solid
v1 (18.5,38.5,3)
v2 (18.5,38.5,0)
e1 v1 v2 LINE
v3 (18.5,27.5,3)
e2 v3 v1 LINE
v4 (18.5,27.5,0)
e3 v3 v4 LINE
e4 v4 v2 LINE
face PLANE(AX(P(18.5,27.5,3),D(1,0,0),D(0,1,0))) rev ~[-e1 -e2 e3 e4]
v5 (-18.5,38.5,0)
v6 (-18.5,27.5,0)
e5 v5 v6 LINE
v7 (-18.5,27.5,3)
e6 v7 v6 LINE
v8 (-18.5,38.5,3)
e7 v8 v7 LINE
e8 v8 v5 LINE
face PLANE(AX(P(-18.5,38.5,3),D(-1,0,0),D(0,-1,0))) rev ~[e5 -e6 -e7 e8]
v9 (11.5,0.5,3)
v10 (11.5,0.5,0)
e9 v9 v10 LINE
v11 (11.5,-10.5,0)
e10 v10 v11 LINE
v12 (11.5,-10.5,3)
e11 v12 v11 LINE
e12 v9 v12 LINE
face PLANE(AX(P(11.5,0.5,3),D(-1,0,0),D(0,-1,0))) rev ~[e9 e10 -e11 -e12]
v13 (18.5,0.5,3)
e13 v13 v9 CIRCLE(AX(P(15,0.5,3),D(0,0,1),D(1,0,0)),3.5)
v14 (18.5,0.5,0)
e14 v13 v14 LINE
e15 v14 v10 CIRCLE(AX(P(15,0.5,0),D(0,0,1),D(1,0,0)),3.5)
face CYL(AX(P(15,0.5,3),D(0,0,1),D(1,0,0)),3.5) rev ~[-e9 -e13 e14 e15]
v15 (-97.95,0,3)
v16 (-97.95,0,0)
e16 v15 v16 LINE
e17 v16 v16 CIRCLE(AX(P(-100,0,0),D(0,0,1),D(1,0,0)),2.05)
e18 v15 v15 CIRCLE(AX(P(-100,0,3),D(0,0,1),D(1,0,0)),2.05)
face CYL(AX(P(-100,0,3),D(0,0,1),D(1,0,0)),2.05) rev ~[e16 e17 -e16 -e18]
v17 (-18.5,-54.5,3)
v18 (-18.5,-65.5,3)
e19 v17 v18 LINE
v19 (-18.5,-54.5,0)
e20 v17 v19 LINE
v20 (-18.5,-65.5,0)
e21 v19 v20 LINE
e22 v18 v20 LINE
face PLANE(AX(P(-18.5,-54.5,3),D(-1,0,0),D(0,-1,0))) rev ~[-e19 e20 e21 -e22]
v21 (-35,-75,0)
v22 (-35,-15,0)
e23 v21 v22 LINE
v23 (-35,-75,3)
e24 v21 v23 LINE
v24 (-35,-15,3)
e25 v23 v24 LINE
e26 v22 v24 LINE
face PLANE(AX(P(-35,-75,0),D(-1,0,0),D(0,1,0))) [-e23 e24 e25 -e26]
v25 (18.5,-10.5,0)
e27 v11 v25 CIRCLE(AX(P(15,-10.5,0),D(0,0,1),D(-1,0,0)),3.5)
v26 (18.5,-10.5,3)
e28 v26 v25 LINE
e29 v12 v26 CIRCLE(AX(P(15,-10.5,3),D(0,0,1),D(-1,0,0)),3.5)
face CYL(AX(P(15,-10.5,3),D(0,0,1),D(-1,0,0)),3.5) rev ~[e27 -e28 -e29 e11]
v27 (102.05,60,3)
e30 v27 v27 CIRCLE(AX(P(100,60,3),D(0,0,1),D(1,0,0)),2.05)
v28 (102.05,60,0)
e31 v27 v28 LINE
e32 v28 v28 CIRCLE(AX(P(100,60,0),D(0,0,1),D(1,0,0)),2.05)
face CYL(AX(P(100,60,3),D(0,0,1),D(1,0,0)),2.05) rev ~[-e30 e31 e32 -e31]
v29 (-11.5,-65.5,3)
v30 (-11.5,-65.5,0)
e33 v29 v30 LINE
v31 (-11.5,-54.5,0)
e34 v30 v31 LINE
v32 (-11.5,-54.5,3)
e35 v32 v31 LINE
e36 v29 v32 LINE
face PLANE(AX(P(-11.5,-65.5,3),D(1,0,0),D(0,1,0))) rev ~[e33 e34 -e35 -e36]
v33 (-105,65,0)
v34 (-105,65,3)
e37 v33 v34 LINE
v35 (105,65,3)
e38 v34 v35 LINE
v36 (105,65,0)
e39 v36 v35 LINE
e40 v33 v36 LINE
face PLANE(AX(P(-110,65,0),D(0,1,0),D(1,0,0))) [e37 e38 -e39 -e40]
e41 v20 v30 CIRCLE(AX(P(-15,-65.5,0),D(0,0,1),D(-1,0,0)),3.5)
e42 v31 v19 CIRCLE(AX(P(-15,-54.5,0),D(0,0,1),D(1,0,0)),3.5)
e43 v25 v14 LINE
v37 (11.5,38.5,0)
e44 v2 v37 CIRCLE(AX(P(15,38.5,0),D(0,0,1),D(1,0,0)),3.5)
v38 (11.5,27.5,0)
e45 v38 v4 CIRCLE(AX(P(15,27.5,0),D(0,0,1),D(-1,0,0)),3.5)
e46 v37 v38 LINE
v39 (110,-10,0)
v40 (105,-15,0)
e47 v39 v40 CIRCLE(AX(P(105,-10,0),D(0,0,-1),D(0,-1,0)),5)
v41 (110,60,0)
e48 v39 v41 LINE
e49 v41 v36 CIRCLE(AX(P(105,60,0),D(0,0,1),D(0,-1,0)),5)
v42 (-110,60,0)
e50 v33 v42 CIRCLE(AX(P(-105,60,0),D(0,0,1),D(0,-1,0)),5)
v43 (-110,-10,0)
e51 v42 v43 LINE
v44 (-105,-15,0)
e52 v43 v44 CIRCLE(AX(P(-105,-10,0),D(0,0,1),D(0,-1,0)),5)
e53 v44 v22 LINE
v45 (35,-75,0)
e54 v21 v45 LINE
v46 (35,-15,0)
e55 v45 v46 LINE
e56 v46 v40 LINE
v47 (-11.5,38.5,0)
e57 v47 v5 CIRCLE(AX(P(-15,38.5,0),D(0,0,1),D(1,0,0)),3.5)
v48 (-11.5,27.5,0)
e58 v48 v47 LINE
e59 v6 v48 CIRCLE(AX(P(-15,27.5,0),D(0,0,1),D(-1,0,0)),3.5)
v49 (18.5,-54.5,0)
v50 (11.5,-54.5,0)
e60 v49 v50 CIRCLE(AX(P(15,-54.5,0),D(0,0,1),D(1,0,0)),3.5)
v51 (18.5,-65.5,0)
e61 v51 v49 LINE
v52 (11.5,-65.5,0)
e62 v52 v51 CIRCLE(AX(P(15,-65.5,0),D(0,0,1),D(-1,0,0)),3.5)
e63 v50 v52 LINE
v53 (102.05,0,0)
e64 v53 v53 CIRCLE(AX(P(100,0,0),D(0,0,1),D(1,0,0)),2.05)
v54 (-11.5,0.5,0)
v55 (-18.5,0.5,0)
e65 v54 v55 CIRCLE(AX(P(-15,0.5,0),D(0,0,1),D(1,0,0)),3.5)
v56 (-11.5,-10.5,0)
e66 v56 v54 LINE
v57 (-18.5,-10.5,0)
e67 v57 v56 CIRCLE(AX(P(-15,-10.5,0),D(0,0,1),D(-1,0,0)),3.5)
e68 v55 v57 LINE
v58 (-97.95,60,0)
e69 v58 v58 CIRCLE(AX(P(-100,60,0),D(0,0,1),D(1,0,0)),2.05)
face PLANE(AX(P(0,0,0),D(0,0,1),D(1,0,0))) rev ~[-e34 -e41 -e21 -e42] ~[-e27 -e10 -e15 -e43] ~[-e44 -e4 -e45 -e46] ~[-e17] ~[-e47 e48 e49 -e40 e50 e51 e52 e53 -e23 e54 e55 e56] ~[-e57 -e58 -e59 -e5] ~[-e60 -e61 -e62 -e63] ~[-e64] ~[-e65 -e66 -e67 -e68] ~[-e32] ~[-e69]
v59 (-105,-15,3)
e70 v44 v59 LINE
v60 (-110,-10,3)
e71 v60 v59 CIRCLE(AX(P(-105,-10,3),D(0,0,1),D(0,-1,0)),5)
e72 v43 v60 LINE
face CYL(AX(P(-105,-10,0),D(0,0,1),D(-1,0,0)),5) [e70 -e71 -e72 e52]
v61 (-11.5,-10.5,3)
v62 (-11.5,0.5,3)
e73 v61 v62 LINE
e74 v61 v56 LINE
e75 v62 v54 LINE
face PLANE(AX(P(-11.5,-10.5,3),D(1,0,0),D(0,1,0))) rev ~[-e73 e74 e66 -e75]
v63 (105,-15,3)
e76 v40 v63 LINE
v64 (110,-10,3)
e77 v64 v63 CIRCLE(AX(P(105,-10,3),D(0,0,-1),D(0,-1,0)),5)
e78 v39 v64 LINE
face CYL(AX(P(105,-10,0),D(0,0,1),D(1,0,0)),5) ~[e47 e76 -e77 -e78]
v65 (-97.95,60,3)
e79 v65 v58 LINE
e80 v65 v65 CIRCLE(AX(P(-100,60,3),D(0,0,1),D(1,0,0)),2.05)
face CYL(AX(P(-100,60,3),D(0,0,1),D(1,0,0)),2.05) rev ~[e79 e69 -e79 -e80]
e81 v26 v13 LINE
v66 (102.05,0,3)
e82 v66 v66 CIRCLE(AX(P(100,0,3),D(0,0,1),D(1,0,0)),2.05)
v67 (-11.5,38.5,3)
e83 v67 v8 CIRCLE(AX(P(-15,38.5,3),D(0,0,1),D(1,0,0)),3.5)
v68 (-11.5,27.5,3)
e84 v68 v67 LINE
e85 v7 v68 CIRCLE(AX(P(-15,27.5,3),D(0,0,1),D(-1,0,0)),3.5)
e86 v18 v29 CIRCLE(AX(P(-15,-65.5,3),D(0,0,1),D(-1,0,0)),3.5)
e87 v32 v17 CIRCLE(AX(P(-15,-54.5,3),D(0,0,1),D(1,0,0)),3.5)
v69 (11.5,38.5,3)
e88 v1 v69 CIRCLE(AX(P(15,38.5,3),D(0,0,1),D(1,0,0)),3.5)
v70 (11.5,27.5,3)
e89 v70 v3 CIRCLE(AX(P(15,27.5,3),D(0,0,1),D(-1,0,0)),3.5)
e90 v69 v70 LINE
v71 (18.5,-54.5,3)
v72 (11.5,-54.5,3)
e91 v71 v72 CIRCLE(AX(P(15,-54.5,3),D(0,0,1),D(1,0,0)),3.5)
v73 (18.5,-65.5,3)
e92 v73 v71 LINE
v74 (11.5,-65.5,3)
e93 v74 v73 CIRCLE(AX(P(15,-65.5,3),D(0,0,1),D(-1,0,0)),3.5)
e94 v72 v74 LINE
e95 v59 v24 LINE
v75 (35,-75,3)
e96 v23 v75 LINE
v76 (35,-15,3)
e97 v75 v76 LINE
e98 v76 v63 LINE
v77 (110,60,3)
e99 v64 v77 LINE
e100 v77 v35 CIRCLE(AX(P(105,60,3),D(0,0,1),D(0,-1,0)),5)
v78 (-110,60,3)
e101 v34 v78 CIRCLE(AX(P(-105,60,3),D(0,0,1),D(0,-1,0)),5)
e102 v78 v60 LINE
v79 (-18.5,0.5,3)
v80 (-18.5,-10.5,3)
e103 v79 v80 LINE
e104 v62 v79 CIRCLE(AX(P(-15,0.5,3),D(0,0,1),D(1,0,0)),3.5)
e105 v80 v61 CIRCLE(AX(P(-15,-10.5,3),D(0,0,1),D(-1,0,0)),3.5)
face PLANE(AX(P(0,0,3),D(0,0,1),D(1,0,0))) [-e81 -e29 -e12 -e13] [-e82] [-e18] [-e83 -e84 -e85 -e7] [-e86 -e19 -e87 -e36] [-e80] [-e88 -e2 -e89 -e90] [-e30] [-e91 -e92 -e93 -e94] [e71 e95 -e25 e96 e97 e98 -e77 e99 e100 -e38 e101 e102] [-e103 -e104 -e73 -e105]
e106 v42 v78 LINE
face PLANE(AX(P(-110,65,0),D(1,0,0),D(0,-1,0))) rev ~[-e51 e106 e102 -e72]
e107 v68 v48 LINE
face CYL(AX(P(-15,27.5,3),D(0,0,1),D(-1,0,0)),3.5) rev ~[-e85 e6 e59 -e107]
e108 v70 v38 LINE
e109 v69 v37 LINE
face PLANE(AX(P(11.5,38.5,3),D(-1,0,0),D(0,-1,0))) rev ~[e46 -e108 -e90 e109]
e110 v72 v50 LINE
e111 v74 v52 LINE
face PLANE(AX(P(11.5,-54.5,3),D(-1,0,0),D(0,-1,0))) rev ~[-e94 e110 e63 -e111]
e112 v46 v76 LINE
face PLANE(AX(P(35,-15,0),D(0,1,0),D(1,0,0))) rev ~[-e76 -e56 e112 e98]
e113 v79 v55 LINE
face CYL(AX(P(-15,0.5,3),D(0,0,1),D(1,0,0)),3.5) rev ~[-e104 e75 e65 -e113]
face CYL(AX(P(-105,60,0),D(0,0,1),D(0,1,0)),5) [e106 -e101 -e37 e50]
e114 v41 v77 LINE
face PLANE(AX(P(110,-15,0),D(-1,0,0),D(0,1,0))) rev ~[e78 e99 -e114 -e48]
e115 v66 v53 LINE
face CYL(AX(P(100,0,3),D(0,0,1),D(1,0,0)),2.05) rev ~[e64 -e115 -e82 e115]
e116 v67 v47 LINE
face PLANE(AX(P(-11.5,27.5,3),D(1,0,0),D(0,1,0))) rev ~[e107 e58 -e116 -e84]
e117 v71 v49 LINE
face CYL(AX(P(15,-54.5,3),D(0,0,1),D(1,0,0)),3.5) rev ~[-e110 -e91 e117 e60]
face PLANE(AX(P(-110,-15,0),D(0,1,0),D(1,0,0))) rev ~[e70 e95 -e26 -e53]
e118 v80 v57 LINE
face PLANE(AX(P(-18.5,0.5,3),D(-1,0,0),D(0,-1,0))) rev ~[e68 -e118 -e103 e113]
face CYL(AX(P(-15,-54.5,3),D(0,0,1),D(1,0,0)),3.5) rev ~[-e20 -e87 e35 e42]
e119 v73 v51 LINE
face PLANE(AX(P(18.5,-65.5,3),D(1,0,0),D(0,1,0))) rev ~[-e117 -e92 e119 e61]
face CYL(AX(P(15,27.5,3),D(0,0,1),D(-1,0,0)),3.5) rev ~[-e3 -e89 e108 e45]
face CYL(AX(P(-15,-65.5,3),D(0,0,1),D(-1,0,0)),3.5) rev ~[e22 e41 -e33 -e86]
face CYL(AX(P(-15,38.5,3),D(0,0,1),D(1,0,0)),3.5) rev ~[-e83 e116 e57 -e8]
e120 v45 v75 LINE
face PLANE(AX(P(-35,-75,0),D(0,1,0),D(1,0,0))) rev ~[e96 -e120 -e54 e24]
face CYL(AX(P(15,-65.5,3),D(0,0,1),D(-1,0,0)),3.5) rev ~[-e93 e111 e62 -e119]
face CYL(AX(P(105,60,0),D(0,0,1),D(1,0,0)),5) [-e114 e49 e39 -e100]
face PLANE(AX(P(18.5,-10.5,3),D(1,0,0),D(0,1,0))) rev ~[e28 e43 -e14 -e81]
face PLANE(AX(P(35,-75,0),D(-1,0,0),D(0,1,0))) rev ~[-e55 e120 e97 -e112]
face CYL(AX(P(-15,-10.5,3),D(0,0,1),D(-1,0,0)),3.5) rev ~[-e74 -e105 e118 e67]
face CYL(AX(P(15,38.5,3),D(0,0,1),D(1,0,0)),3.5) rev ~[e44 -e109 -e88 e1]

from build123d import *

# Parameters (mm, degrees)
F0_W     = 70
F0_H     = 60
F0_W_2   = 220
F0_H_2   = 50
F1_DEPTH = 3
F2_R     = 2.05
F3_DEPTH = 25
F4_R     = 5


# Not quite as in the source:
# - a feature names something its author has since deleted; it is built from what else it names


with BuildPart() as f1:
    # F0 (on Top) → F1 (new body)
    with BuildSketch(Plane.XY):
        Polygon((35, -15), (110, -15), (110, 15), (-110, 15), (-110, -15), (-35, -15), align=None)
        with Locations((0, -45)):
            Rectangle(F0_W, F0_H)
        with Locations((0, 40)):
            Rectangle(F0_W_2, F0_H_2)
    extrude(amount=F1_DEPTH)

    # F2 (on face) → F3 (cut)
    with BuildSketch(Plane.XY.offset(3)):
        with Locations((-100, 0)):
            Circle(F2_R)
        with Locations((100, 0)):
            Circle(F2_R)
        with BuildLine():
            ThreePointArc((-18.5, 27.5), (-15, 24), (-11.5, 27.5))
            Line((-11.5, 27.5), (-11.5, 38.5))
            ThreePointArc((-11.5, 38.5), (-15, 42), (-18.5, 38.5))
            Line((-18.5, 38.5), (-18.5, 27.5))
        make_face()
        with BuildLine():
            ThreePointArc((11.5, 27.5), (15, 24), (18.5, 27.5))
            Line((18.5, 27.5), (18.5, 38.5))
            ThreePointArc((18.5, 38.5), (15, 42), (11.5, 38.5))
            Line((11.5, 38.5), (11.5, 27.5))
        make_face()
        with BuildLine():
            ThreePointArc((-18.5, -65.5), (-15, -69), (-11.5, -65.5))
            Line((-11.5, -65.5), (-11.5, -54.5))
            ThreePointArc((-11.5, -54.5), (-15, -51), (-18.5, -54.5))
            Line((-18.5, -54.5), (-18.5, -65.5))
        make_face()
        with BuildLine():
            ThreePointArc((11.5, -65.5), (15, -69), (18.5, -65.5))
            Line((18.5, -65.5), (18.5, -54.5))
            ThreePointArc((18.5, -54.5), (15, -51), (11.5, -54.5))
            Line((11.5, -54.5), (11.5, -65.5))
        make_face()
        with Locations((-100, 60)):
            Circle(F2_R)
        with Locations((100, 60)):
            Circle(F2_R)
        with BuildLine():
            ThreePointArc((-18.5, -10.5), (-15, -14), (-11.5, -10.5))
            Line((-11.5, -10.5), (-11.5, 0.5))
            ThreePointArc((-11.5, 0.5), (-15, 4), (-18.5, 0.5))
            Line((-18.5, 0.5), (-18.5, -10.5))
        make_face()
        with BuildLine():
            ThreePointArc((11.5, -10.5), (15, -14), (18.5, -10.5))
            Line((18.5, -10.5), (18.5, 0.5))
            ThreePointArc((18.5, 0.5), (15, 4), (11.5, 0.5))
            Line((11.5, 0.5), (11.5, -10.5))
        make_face()
    extrude(amount=-F3_DEPTH, mode=Mode.SUBTRACT)

    # F4
    f4_edges = [f1.edges().sort_by_distance(p)[0] for p in [
        (-110, -15, 1.5),
        (110, -15, 1.5),
        (110, 65, 1.5),
        (-110, 65, 1.5),
    ]]
    fillet(f4_edges, radius=F4_R)


solid = f1.part
